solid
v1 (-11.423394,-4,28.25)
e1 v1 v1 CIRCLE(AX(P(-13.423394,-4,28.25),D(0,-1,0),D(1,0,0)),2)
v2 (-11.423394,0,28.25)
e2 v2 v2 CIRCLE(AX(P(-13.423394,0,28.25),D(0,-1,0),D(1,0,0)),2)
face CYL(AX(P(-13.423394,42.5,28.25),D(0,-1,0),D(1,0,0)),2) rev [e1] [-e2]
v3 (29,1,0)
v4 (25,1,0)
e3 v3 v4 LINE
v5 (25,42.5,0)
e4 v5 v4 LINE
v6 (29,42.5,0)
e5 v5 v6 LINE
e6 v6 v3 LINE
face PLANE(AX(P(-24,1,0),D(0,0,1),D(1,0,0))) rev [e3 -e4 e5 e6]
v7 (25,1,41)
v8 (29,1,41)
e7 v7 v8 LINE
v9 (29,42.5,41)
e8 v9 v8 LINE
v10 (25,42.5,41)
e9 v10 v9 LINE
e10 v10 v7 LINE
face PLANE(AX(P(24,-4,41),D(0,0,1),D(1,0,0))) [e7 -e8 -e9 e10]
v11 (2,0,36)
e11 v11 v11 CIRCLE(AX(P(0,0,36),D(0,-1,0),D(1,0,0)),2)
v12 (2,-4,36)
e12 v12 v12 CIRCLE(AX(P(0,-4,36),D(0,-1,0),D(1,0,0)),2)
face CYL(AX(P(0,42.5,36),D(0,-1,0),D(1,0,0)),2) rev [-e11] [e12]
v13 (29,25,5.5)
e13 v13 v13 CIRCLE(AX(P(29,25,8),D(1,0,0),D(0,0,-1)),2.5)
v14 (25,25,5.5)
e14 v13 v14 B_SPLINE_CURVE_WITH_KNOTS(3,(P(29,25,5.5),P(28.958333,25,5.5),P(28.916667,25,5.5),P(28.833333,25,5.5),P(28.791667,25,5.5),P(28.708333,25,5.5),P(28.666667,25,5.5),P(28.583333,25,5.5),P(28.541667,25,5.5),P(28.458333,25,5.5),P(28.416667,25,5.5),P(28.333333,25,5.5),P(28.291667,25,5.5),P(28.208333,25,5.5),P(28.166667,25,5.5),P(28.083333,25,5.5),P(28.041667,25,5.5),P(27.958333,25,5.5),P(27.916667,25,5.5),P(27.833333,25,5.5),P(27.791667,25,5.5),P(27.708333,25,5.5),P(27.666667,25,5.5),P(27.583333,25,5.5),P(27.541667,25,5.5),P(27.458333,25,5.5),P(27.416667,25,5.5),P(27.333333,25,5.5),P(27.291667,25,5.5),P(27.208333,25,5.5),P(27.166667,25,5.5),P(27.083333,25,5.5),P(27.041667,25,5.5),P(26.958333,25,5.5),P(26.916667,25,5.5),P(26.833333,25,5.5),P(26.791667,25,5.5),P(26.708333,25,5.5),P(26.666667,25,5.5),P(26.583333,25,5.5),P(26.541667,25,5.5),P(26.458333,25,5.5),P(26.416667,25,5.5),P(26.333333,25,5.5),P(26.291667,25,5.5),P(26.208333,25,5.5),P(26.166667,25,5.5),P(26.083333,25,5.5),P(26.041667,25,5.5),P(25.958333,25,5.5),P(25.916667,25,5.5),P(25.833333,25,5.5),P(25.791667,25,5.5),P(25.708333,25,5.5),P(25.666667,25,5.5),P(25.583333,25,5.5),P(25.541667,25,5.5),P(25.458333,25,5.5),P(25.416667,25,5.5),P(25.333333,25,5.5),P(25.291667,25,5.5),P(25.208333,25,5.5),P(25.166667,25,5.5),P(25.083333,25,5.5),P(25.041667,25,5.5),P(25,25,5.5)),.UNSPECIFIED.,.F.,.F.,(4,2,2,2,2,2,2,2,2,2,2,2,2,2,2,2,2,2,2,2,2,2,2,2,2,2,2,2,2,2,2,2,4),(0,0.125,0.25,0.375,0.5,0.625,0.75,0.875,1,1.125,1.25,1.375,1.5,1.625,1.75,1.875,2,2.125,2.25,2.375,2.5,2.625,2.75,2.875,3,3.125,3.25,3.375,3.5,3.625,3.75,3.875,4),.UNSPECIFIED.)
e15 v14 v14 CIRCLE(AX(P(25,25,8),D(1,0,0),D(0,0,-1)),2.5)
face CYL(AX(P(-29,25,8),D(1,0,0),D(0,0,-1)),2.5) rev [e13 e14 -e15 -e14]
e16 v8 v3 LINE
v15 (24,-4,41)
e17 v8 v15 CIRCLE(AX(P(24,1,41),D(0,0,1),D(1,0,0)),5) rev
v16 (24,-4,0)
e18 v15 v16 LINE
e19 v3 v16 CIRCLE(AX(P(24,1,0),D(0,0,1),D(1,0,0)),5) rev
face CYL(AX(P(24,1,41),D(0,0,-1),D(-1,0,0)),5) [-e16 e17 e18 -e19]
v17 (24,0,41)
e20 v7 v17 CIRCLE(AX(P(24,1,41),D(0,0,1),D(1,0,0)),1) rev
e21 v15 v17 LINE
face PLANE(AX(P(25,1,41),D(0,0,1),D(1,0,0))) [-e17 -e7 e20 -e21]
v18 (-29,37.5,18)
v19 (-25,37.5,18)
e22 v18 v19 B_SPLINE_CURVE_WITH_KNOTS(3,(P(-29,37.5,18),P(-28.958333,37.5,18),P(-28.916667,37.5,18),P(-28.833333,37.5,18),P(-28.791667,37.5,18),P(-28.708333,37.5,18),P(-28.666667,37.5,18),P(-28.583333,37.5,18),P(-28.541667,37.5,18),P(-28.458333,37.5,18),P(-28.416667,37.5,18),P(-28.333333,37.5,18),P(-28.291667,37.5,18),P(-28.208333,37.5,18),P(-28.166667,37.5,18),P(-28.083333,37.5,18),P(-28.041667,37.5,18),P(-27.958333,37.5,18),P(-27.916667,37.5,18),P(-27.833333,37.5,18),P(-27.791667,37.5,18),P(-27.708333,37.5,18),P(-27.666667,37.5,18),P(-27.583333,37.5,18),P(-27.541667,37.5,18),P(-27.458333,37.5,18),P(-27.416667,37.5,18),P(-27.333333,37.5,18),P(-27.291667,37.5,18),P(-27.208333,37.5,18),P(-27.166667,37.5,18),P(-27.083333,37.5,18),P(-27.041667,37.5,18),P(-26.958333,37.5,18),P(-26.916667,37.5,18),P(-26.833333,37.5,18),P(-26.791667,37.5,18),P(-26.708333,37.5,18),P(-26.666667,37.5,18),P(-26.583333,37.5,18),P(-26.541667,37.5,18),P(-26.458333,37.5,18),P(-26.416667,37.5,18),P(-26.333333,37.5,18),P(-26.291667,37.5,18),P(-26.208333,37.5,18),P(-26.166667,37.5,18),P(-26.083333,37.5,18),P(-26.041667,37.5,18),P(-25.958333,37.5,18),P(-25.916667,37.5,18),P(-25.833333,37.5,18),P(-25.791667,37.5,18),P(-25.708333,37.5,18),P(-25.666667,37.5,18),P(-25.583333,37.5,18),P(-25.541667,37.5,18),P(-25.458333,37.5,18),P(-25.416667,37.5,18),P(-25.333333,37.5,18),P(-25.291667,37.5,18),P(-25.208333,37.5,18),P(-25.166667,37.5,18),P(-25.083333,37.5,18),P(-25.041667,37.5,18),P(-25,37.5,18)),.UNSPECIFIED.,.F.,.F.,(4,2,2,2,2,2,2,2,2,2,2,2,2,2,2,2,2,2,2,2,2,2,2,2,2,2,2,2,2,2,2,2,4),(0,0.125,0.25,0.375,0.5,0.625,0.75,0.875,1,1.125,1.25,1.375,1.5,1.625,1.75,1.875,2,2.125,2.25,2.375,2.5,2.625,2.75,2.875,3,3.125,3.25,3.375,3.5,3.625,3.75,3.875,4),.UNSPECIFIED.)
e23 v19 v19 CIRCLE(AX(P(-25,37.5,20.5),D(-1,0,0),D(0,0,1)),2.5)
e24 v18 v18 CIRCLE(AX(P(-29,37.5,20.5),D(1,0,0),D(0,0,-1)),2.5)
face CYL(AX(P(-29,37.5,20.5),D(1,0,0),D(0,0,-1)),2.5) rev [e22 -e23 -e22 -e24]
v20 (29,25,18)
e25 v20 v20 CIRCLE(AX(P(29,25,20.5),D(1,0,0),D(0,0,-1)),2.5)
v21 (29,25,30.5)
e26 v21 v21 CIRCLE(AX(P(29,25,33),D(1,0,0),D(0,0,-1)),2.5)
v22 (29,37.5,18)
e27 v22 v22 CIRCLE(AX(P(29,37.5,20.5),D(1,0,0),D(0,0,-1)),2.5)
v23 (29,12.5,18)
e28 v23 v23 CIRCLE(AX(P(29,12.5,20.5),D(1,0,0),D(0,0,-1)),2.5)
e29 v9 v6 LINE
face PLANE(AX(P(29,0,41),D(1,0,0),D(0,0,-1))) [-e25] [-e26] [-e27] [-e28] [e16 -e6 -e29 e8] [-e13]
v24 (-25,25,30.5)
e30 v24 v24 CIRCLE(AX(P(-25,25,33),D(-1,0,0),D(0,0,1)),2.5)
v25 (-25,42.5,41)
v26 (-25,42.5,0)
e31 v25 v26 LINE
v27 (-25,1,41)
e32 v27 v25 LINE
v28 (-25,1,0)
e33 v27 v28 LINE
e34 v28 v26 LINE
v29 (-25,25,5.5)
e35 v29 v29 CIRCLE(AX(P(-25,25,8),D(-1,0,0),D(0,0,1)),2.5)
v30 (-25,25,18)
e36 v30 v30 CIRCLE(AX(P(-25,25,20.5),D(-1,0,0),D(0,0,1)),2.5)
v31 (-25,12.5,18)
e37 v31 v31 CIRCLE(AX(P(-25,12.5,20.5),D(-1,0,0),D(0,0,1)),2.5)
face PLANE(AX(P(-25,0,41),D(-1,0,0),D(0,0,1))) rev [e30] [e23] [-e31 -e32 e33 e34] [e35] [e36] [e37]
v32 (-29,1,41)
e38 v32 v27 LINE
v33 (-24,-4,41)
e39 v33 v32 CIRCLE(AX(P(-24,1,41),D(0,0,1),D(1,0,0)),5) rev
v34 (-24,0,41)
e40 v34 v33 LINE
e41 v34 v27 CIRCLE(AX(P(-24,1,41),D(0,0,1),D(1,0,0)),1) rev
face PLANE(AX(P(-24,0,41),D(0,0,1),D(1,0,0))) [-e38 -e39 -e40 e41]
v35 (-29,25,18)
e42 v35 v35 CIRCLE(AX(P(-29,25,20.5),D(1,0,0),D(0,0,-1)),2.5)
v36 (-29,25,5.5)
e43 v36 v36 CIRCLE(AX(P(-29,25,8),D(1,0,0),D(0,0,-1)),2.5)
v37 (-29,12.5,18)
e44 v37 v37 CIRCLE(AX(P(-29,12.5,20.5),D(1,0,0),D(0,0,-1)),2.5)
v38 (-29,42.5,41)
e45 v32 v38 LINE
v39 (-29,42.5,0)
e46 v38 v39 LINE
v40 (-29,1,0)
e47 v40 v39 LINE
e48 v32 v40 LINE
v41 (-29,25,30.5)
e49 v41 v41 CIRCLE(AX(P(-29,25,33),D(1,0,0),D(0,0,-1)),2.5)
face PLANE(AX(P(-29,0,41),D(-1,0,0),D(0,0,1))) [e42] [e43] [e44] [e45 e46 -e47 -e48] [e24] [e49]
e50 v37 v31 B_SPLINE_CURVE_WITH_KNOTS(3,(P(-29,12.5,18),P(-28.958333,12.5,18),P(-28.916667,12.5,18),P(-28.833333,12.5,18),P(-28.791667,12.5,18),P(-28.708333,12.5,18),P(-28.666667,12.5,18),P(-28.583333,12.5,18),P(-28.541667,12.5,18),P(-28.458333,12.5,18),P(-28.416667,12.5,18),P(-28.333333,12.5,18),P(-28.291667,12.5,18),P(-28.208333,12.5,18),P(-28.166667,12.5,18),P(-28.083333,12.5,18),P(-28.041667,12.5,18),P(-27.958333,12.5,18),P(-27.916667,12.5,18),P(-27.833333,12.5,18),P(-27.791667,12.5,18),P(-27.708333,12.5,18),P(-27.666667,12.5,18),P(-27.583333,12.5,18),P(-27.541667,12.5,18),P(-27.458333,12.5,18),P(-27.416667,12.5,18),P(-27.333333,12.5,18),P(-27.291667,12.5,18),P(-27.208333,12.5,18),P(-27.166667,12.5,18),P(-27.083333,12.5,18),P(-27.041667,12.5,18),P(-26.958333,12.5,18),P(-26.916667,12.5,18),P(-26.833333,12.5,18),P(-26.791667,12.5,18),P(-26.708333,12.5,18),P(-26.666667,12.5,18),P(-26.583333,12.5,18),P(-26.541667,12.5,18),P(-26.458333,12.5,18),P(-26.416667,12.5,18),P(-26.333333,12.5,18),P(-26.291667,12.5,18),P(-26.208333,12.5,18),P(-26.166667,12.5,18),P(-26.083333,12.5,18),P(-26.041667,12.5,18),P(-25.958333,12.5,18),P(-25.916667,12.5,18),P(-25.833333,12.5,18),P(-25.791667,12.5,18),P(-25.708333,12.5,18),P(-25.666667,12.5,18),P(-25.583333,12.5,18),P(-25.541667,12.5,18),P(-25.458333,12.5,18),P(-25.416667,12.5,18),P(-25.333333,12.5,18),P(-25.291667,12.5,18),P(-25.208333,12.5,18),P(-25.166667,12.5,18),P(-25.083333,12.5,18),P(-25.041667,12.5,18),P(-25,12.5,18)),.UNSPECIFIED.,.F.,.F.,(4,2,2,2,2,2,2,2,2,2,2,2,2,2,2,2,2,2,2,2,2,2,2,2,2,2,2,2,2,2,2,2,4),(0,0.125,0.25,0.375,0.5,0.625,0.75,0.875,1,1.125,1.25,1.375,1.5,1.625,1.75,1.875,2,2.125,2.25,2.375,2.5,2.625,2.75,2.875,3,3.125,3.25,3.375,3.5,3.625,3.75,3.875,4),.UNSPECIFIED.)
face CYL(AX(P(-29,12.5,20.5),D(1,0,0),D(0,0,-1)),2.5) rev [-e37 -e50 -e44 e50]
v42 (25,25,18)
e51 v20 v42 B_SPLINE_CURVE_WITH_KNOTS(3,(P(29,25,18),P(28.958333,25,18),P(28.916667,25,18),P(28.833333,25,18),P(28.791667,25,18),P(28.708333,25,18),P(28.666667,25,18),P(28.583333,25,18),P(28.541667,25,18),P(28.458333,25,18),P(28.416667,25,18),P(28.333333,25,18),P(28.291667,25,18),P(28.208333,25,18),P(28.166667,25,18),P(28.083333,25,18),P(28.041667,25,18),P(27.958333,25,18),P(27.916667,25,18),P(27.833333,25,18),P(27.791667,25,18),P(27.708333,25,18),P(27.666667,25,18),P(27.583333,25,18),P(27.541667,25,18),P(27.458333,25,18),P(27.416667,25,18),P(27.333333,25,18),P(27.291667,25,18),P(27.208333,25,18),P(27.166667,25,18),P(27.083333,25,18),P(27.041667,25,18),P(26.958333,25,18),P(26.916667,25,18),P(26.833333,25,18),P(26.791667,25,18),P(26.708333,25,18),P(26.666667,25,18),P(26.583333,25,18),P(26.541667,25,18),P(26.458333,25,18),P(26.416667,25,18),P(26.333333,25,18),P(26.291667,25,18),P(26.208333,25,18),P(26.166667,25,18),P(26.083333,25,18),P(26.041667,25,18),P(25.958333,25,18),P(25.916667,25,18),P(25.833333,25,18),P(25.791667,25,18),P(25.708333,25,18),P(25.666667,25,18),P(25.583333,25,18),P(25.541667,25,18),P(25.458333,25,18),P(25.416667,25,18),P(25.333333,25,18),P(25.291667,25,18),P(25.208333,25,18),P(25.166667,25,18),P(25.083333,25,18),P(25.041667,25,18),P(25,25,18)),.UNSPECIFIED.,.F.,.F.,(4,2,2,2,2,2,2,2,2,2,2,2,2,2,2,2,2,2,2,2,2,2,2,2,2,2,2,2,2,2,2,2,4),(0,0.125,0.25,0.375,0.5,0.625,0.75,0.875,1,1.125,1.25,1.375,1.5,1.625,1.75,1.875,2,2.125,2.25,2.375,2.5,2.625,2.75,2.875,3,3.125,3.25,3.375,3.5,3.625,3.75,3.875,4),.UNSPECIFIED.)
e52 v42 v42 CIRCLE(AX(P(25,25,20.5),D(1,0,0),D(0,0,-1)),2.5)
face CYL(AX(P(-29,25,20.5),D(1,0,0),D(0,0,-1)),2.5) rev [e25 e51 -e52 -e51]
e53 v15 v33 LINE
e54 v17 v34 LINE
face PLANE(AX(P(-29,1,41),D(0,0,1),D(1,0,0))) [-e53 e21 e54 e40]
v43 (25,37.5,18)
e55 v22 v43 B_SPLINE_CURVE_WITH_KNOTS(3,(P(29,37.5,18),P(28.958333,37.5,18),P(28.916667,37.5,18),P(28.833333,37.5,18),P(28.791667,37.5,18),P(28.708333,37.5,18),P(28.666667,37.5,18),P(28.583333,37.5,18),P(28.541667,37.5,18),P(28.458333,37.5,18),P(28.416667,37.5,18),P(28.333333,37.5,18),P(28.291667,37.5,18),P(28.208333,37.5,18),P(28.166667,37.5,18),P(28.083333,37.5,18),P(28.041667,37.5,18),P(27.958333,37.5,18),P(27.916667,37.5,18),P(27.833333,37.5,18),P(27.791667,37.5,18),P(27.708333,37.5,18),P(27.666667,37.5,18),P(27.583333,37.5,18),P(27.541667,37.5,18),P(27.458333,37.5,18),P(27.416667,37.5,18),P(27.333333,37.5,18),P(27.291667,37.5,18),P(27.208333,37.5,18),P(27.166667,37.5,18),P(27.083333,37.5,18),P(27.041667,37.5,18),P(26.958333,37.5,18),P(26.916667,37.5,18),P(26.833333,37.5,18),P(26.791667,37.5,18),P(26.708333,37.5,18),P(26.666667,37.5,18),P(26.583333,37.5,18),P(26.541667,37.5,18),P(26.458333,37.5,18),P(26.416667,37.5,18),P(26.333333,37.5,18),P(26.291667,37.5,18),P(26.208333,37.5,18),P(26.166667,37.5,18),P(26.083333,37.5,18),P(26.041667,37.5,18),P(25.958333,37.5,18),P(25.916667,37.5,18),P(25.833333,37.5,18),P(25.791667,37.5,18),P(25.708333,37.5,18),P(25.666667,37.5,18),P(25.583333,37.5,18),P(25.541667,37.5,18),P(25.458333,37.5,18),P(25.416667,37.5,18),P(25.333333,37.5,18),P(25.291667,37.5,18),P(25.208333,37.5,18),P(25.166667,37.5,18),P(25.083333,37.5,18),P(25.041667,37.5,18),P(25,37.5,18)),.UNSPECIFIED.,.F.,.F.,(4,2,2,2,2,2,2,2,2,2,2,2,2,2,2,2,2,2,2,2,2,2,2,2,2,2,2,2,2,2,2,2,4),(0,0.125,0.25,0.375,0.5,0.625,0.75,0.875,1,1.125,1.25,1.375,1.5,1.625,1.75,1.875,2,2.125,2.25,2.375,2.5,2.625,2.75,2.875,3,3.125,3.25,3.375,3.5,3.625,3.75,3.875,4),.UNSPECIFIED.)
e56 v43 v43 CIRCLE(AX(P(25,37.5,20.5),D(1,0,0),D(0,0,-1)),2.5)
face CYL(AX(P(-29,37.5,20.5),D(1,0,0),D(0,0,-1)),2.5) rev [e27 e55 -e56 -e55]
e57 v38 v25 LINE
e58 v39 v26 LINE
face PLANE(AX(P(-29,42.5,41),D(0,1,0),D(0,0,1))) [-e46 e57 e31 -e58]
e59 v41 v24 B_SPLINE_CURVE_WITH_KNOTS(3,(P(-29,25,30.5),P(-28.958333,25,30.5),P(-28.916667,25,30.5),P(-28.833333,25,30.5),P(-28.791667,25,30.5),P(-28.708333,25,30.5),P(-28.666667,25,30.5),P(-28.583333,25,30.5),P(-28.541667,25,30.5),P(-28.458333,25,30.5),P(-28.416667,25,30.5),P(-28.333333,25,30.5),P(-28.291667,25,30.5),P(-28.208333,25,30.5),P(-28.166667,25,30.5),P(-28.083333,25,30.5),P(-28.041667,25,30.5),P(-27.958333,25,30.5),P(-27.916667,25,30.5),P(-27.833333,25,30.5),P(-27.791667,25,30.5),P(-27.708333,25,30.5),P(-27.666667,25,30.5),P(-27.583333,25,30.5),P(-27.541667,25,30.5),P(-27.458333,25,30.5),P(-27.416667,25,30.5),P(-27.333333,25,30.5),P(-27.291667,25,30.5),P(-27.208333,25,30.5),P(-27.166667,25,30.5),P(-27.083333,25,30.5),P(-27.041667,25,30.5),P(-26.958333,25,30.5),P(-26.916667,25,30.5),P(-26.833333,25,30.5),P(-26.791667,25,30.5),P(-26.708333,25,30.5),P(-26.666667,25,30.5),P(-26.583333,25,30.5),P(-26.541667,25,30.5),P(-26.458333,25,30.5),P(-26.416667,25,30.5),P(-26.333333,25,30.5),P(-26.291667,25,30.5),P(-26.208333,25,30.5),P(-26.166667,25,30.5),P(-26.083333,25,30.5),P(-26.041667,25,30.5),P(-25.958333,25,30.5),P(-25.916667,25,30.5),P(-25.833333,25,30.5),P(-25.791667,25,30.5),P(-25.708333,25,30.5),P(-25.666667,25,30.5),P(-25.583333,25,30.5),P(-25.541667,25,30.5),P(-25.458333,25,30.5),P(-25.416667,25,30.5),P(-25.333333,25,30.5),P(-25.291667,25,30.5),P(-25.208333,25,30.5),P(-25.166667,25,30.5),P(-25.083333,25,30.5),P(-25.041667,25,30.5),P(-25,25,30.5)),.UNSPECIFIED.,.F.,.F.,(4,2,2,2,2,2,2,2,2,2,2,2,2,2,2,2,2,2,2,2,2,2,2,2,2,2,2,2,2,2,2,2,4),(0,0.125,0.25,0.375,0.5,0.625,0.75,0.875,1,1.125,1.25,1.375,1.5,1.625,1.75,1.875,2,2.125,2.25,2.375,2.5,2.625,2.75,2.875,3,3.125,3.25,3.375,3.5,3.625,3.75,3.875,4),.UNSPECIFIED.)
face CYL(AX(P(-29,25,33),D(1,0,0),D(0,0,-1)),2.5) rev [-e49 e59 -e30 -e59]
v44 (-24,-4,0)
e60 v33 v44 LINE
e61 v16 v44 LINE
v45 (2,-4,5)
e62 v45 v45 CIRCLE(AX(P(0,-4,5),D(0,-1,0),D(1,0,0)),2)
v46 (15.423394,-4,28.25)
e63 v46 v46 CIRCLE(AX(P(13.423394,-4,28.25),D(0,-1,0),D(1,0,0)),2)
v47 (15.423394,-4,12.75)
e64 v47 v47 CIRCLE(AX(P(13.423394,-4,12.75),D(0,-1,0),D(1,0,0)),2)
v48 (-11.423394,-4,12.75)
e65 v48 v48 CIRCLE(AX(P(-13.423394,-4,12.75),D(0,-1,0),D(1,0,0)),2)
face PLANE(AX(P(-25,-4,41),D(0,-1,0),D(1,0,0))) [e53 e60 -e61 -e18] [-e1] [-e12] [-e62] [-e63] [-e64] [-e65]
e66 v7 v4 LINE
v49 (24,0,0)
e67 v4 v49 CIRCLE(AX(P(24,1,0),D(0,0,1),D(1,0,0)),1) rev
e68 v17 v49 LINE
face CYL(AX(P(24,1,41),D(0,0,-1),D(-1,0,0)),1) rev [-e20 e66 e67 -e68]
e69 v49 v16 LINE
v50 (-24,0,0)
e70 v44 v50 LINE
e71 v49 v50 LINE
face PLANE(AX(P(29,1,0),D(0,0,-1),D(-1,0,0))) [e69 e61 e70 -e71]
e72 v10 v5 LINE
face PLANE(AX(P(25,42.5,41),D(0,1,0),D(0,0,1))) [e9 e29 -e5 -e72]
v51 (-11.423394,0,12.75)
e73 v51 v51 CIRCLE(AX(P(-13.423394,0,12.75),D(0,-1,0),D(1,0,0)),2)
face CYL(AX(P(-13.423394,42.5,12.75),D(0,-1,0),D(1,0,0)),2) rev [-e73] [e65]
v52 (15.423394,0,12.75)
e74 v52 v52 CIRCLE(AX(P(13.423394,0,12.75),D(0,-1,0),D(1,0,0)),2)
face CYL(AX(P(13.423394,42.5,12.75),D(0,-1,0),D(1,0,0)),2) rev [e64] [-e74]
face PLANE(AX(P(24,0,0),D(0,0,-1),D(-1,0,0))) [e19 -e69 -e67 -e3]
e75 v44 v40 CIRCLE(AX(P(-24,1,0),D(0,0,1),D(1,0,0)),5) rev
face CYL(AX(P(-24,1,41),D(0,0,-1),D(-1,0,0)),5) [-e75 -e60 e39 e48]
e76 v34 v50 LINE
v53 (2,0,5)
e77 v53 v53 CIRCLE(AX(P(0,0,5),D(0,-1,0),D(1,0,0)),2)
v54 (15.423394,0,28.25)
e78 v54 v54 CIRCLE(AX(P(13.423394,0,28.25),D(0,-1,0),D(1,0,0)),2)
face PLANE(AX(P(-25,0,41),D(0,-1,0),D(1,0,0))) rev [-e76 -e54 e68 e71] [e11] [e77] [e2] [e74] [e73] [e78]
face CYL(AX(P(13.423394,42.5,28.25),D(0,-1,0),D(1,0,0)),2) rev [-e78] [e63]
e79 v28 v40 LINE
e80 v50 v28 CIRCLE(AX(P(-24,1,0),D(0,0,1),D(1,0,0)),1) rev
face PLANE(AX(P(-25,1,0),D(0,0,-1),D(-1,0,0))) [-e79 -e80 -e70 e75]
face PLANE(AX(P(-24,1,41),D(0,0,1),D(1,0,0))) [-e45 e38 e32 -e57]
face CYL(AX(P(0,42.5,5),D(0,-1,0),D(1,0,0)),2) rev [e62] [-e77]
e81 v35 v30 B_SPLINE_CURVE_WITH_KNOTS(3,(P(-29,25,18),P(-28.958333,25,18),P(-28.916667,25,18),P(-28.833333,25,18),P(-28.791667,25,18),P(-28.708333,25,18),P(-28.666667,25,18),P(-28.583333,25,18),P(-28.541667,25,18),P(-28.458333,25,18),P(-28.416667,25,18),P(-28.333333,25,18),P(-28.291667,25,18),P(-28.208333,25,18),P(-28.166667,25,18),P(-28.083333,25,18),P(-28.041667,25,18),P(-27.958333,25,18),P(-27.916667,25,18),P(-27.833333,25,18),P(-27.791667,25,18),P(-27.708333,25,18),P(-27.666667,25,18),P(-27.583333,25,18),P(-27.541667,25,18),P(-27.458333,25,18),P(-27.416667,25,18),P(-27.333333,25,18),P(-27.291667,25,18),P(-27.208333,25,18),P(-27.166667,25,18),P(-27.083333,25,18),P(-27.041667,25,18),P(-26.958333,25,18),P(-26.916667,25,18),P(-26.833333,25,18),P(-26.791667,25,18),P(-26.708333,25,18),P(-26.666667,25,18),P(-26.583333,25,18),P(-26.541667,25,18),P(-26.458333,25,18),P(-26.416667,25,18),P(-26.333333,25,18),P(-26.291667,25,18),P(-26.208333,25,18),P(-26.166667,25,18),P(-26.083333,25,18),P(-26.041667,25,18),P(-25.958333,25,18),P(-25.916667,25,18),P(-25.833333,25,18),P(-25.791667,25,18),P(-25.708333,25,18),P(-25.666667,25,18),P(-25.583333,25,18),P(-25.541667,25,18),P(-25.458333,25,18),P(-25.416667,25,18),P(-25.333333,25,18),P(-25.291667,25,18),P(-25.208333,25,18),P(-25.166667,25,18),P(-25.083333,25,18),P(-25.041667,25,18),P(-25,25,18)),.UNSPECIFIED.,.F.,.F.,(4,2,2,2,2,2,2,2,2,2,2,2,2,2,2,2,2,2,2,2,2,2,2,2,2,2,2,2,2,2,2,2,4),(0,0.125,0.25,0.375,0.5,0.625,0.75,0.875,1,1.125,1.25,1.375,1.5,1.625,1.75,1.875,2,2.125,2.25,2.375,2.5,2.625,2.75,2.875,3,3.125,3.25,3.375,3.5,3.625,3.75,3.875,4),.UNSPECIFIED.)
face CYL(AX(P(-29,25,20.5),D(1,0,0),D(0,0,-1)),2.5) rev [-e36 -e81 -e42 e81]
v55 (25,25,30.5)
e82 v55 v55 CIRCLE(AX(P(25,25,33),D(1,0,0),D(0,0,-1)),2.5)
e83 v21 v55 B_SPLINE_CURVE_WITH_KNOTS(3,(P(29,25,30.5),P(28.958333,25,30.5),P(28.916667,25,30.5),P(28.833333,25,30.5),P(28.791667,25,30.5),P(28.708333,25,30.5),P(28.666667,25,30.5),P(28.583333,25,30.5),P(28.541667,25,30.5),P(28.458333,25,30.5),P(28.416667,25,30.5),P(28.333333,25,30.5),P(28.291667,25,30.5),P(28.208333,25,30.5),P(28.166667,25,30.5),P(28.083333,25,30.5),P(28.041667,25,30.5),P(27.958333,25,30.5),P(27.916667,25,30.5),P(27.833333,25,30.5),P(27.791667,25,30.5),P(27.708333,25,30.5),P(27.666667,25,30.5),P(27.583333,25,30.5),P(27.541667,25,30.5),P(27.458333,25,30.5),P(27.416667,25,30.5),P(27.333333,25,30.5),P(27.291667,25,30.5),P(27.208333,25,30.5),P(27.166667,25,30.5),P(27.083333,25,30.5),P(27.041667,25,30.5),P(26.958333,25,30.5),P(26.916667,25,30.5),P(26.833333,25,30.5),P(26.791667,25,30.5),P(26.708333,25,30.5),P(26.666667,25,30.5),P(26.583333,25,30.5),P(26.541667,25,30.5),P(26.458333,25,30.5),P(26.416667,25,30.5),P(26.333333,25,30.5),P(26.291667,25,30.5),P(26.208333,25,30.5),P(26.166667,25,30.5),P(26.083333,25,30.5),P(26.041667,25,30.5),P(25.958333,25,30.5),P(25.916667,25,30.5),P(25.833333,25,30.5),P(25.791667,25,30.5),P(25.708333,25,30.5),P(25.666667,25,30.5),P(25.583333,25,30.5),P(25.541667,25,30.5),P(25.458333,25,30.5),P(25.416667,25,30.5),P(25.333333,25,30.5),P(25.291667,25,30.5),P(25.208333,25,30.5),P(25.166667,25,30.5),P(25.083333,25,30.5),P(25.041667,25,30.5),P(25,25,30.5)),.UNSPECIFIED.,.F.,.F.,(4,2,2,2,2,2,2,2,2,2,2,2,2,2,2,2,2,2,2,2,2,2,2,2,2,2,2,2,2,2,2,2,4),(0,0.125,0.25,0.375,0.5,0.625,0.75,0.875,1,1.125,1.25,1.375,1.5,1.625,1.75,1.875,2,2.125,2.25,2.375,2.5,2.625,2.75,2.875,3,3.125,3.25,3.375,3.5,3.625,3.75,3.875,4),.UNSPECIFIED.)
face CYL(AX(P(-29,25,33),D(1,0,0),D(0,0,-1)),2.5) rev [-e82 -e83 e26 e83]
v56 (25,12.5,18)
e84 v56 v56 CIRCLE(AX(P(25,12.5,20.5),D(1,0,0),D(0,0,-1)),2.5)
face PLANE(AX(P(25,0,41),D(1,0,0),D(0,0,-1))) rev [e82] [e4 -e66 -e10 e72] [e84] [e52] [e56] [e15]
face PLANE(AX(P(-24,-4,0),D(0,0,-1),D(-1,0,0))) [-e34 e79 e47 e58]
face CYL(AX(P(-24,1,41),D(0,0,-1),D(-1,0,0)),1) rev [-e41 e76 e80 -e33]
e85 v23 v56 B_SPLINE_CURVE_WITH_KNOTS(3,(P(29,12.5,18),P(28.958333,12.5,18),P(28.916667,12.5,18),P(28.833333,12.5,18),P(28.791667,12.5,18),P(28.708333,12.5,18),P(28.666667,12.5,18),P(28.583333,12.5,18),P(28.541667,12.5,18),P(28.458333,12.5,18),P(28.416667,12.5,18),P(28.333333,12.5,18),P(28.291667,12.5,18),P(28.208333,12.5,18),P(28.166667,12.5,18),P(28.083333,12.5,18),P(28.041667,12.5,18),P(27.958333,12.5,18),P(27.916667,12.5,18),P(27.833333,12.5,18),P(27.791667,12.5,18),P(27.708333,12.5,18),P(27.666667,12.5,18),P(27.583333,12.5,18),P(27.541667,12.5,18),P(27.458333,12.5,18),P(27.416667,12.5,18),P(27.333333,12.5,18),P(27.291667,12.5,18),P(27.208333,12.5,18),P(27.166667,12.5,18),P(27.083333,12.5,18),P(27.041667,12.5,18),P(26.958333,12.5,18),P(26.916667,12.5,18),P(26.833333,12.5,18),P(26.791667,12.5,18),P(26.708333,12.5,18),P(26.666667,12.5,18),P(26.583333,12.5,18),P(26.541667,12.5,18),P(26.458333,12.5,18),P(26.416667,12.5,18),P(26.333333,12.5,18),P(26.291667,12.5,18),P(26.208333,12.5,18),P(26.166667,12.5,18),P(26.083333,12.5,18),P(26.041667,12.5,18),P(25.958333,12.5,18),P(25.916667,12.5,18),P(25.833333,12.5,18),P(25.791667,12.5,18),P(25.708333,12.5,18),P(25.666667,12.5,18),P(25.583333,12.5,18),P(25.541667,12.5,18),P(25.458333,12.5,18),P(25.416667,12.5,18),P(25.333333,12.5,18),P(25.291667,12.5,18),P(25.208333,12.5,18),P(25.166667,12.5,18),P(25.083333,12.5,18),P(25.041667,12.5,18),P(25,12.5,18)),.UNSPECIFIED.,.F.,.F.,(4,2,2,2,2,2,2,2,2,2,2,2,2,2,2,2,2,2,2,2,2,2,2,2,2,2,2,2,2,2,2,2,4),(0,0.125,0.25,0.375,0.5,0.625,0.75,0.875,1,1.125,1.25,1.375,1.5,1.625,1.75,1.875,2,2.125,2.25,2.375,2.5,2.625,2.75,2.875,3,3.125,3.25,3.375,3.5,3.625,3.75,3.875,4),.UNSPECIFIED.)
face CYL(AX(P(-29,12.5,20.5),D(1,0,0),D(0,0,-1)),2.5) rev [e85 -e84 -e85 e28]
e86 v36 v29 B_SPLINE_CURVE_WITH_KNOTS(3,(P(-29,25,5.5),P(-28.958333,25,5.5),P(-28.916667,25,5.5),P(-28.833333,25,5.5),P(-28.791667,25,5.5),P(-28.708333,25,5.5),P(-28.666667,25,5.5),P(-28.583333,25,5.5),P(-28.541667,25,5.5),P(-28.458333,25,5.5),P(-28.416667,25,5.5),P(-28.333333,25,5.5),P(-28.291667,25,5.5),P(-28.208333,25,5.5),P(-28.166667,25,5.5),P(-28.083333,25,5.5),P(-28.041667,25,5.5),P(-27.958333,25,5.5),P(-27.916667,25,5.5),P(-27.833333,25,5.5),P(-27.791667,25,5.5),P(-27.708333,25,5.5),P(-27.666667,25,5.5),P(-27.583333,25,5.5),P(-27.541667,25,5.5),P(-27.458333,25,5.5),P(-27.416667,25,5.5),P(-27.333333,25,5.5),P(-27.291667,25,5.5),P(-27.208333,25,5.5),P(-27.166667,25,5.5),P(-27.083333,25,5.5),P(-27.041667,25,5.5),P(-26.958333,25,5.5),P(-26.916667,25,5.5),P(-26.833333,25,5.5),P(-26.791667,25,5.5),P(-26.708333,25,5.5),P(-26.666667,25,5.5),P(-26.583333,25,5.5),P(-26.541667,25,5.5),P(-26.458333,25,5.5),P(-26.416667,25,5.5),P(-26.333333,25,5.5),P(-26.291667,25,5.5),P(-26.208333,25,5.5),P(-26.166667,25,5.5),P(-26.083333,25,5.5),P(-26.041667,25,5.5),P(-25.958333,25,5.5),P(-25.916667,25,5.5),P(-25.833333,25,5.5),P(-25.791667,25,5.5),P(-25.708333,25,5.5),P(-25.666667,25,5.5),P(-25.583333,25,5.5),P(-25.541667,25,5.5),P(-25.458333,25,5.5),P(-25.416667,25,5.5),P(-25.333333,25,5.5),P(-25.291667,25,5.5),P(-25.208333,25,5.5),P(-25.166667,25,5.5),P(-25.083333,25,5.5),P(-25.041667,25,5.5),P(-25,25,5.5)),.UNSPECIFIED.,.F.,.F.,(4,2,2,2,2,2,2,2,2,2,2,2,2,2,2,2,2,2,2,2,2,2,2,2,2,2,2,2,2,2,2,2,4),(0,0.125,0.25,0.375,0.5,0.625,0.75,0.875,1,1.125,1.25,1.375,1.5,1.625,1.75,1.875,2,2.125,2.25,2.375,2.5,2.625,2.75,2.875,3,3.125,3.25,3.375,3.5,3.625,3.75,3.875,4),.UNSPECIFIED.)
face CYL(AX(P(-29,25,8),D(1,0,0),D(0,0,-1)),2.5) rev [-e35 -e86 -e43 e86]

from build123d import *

# Parameters (mm, degrees)
SM_BASE_FLANGE_1_DEPTH   = 41
SKETCH_9_R               = 2
CUT_EXTRUDE_4_DEPTH      = 69.441580929
CUT_EXTRUDE_5_DEPTH      = 83.772277968
CUT_EXTRUDE_5_DEPTH_BACK = 83.772277968
SKETCH_10_R              = 2.5


# Sheet-metal steps are written as plain solids
with BuildPart() as part:
    # Sketch 1 → Базовая кромка1 (new body)
    with BuildSketch(Plane.XY):
        with BuildLine():
            Line((-25, 42.5), (-25, 1))
            ThreePointArc((-25, 1), (-24.707106781, 0.292893219), (-24, 0))
            Line((-24, 0), (24, 0))
            ThreePointArc((24, 0), (24.707106781, 0.292893219), (25, 1))
            Line((25, 1), (25, 42.5))
            Line((25, 42.5), (29, 42.5))
            Line((29, 42.5), (29, 1))
            ThreePointArc((29, 1), (27.535533906, -2.535533906), (24, -4))
            Line((24, -4), (-24, -4))
            ThreePointArc((-24, -4), (-27.535533906, -2.535533906), (-29, 1))
            Line((-29, 1), (-29, 42.5))
            Line((-29, 42.5), (-25, 42.5))
        make_face()
    extrude(amount=SM_BASE_FLANGE_1_DEPTH)

    # Эскиз9 → Вырез-Вытянуть4 (cut, through all)
    with BuildSketch(Plane.XZ.offset(4)):
        with Locations((0, 5)):
            Circle(SKETCH_9_R)
        with Locations((-13.423393759, 12.75)):
            Circle(SKETCH_9_R)
        with Locations((-13.423393759, 28.25)):
            Circle(SKETCH_9_R)
        with Locations((0, 36)):
            Circle(SKETCH_9_R)
        with Locations((13.423393759, 28.25)):
            Circle(SKETCH_9_R)
        with Locations((13.423393759, 12.75)):
            Circle(SKETCH_9_R)
    extrude(amount=-CUT_EXTRUDE_4_DEPTH, mode=Mode.SUBTRACT)

    # Эскиз10 → Вырез-Вытянуть5 (cut, two sides: drawn at the far end of the back side and taken through both)
    with BuildSketch(Plane(origin=(29, 0, 0), x_dir=(0, 0, -1), z_dir=(1, 0, 0)).offset(-CUT_EXTRUDE_5_DEPTH_BACK)):
        with Locations((-33, 25)):
            Circle(SKETCH_10_R)
        with Locations((-20.5, 25)):
            Circle(SKETCH_10_R)
        with Locations((-8, 25)):
            Circle(SKETCH_10_R)
        with Locations((-20.5, 12.5)):
            Circle(SKETCH_10_R)
        with Locations((-20.5, 37.5)):
            Circle(SKETCH_10_R)
    extrude(amount=CUT_EXTRUDE_5_DEPTH + CUT_EXTRUDE_5_DEPTH_BACK, mode=Mode.SUBTRACT)


solid = part.part
